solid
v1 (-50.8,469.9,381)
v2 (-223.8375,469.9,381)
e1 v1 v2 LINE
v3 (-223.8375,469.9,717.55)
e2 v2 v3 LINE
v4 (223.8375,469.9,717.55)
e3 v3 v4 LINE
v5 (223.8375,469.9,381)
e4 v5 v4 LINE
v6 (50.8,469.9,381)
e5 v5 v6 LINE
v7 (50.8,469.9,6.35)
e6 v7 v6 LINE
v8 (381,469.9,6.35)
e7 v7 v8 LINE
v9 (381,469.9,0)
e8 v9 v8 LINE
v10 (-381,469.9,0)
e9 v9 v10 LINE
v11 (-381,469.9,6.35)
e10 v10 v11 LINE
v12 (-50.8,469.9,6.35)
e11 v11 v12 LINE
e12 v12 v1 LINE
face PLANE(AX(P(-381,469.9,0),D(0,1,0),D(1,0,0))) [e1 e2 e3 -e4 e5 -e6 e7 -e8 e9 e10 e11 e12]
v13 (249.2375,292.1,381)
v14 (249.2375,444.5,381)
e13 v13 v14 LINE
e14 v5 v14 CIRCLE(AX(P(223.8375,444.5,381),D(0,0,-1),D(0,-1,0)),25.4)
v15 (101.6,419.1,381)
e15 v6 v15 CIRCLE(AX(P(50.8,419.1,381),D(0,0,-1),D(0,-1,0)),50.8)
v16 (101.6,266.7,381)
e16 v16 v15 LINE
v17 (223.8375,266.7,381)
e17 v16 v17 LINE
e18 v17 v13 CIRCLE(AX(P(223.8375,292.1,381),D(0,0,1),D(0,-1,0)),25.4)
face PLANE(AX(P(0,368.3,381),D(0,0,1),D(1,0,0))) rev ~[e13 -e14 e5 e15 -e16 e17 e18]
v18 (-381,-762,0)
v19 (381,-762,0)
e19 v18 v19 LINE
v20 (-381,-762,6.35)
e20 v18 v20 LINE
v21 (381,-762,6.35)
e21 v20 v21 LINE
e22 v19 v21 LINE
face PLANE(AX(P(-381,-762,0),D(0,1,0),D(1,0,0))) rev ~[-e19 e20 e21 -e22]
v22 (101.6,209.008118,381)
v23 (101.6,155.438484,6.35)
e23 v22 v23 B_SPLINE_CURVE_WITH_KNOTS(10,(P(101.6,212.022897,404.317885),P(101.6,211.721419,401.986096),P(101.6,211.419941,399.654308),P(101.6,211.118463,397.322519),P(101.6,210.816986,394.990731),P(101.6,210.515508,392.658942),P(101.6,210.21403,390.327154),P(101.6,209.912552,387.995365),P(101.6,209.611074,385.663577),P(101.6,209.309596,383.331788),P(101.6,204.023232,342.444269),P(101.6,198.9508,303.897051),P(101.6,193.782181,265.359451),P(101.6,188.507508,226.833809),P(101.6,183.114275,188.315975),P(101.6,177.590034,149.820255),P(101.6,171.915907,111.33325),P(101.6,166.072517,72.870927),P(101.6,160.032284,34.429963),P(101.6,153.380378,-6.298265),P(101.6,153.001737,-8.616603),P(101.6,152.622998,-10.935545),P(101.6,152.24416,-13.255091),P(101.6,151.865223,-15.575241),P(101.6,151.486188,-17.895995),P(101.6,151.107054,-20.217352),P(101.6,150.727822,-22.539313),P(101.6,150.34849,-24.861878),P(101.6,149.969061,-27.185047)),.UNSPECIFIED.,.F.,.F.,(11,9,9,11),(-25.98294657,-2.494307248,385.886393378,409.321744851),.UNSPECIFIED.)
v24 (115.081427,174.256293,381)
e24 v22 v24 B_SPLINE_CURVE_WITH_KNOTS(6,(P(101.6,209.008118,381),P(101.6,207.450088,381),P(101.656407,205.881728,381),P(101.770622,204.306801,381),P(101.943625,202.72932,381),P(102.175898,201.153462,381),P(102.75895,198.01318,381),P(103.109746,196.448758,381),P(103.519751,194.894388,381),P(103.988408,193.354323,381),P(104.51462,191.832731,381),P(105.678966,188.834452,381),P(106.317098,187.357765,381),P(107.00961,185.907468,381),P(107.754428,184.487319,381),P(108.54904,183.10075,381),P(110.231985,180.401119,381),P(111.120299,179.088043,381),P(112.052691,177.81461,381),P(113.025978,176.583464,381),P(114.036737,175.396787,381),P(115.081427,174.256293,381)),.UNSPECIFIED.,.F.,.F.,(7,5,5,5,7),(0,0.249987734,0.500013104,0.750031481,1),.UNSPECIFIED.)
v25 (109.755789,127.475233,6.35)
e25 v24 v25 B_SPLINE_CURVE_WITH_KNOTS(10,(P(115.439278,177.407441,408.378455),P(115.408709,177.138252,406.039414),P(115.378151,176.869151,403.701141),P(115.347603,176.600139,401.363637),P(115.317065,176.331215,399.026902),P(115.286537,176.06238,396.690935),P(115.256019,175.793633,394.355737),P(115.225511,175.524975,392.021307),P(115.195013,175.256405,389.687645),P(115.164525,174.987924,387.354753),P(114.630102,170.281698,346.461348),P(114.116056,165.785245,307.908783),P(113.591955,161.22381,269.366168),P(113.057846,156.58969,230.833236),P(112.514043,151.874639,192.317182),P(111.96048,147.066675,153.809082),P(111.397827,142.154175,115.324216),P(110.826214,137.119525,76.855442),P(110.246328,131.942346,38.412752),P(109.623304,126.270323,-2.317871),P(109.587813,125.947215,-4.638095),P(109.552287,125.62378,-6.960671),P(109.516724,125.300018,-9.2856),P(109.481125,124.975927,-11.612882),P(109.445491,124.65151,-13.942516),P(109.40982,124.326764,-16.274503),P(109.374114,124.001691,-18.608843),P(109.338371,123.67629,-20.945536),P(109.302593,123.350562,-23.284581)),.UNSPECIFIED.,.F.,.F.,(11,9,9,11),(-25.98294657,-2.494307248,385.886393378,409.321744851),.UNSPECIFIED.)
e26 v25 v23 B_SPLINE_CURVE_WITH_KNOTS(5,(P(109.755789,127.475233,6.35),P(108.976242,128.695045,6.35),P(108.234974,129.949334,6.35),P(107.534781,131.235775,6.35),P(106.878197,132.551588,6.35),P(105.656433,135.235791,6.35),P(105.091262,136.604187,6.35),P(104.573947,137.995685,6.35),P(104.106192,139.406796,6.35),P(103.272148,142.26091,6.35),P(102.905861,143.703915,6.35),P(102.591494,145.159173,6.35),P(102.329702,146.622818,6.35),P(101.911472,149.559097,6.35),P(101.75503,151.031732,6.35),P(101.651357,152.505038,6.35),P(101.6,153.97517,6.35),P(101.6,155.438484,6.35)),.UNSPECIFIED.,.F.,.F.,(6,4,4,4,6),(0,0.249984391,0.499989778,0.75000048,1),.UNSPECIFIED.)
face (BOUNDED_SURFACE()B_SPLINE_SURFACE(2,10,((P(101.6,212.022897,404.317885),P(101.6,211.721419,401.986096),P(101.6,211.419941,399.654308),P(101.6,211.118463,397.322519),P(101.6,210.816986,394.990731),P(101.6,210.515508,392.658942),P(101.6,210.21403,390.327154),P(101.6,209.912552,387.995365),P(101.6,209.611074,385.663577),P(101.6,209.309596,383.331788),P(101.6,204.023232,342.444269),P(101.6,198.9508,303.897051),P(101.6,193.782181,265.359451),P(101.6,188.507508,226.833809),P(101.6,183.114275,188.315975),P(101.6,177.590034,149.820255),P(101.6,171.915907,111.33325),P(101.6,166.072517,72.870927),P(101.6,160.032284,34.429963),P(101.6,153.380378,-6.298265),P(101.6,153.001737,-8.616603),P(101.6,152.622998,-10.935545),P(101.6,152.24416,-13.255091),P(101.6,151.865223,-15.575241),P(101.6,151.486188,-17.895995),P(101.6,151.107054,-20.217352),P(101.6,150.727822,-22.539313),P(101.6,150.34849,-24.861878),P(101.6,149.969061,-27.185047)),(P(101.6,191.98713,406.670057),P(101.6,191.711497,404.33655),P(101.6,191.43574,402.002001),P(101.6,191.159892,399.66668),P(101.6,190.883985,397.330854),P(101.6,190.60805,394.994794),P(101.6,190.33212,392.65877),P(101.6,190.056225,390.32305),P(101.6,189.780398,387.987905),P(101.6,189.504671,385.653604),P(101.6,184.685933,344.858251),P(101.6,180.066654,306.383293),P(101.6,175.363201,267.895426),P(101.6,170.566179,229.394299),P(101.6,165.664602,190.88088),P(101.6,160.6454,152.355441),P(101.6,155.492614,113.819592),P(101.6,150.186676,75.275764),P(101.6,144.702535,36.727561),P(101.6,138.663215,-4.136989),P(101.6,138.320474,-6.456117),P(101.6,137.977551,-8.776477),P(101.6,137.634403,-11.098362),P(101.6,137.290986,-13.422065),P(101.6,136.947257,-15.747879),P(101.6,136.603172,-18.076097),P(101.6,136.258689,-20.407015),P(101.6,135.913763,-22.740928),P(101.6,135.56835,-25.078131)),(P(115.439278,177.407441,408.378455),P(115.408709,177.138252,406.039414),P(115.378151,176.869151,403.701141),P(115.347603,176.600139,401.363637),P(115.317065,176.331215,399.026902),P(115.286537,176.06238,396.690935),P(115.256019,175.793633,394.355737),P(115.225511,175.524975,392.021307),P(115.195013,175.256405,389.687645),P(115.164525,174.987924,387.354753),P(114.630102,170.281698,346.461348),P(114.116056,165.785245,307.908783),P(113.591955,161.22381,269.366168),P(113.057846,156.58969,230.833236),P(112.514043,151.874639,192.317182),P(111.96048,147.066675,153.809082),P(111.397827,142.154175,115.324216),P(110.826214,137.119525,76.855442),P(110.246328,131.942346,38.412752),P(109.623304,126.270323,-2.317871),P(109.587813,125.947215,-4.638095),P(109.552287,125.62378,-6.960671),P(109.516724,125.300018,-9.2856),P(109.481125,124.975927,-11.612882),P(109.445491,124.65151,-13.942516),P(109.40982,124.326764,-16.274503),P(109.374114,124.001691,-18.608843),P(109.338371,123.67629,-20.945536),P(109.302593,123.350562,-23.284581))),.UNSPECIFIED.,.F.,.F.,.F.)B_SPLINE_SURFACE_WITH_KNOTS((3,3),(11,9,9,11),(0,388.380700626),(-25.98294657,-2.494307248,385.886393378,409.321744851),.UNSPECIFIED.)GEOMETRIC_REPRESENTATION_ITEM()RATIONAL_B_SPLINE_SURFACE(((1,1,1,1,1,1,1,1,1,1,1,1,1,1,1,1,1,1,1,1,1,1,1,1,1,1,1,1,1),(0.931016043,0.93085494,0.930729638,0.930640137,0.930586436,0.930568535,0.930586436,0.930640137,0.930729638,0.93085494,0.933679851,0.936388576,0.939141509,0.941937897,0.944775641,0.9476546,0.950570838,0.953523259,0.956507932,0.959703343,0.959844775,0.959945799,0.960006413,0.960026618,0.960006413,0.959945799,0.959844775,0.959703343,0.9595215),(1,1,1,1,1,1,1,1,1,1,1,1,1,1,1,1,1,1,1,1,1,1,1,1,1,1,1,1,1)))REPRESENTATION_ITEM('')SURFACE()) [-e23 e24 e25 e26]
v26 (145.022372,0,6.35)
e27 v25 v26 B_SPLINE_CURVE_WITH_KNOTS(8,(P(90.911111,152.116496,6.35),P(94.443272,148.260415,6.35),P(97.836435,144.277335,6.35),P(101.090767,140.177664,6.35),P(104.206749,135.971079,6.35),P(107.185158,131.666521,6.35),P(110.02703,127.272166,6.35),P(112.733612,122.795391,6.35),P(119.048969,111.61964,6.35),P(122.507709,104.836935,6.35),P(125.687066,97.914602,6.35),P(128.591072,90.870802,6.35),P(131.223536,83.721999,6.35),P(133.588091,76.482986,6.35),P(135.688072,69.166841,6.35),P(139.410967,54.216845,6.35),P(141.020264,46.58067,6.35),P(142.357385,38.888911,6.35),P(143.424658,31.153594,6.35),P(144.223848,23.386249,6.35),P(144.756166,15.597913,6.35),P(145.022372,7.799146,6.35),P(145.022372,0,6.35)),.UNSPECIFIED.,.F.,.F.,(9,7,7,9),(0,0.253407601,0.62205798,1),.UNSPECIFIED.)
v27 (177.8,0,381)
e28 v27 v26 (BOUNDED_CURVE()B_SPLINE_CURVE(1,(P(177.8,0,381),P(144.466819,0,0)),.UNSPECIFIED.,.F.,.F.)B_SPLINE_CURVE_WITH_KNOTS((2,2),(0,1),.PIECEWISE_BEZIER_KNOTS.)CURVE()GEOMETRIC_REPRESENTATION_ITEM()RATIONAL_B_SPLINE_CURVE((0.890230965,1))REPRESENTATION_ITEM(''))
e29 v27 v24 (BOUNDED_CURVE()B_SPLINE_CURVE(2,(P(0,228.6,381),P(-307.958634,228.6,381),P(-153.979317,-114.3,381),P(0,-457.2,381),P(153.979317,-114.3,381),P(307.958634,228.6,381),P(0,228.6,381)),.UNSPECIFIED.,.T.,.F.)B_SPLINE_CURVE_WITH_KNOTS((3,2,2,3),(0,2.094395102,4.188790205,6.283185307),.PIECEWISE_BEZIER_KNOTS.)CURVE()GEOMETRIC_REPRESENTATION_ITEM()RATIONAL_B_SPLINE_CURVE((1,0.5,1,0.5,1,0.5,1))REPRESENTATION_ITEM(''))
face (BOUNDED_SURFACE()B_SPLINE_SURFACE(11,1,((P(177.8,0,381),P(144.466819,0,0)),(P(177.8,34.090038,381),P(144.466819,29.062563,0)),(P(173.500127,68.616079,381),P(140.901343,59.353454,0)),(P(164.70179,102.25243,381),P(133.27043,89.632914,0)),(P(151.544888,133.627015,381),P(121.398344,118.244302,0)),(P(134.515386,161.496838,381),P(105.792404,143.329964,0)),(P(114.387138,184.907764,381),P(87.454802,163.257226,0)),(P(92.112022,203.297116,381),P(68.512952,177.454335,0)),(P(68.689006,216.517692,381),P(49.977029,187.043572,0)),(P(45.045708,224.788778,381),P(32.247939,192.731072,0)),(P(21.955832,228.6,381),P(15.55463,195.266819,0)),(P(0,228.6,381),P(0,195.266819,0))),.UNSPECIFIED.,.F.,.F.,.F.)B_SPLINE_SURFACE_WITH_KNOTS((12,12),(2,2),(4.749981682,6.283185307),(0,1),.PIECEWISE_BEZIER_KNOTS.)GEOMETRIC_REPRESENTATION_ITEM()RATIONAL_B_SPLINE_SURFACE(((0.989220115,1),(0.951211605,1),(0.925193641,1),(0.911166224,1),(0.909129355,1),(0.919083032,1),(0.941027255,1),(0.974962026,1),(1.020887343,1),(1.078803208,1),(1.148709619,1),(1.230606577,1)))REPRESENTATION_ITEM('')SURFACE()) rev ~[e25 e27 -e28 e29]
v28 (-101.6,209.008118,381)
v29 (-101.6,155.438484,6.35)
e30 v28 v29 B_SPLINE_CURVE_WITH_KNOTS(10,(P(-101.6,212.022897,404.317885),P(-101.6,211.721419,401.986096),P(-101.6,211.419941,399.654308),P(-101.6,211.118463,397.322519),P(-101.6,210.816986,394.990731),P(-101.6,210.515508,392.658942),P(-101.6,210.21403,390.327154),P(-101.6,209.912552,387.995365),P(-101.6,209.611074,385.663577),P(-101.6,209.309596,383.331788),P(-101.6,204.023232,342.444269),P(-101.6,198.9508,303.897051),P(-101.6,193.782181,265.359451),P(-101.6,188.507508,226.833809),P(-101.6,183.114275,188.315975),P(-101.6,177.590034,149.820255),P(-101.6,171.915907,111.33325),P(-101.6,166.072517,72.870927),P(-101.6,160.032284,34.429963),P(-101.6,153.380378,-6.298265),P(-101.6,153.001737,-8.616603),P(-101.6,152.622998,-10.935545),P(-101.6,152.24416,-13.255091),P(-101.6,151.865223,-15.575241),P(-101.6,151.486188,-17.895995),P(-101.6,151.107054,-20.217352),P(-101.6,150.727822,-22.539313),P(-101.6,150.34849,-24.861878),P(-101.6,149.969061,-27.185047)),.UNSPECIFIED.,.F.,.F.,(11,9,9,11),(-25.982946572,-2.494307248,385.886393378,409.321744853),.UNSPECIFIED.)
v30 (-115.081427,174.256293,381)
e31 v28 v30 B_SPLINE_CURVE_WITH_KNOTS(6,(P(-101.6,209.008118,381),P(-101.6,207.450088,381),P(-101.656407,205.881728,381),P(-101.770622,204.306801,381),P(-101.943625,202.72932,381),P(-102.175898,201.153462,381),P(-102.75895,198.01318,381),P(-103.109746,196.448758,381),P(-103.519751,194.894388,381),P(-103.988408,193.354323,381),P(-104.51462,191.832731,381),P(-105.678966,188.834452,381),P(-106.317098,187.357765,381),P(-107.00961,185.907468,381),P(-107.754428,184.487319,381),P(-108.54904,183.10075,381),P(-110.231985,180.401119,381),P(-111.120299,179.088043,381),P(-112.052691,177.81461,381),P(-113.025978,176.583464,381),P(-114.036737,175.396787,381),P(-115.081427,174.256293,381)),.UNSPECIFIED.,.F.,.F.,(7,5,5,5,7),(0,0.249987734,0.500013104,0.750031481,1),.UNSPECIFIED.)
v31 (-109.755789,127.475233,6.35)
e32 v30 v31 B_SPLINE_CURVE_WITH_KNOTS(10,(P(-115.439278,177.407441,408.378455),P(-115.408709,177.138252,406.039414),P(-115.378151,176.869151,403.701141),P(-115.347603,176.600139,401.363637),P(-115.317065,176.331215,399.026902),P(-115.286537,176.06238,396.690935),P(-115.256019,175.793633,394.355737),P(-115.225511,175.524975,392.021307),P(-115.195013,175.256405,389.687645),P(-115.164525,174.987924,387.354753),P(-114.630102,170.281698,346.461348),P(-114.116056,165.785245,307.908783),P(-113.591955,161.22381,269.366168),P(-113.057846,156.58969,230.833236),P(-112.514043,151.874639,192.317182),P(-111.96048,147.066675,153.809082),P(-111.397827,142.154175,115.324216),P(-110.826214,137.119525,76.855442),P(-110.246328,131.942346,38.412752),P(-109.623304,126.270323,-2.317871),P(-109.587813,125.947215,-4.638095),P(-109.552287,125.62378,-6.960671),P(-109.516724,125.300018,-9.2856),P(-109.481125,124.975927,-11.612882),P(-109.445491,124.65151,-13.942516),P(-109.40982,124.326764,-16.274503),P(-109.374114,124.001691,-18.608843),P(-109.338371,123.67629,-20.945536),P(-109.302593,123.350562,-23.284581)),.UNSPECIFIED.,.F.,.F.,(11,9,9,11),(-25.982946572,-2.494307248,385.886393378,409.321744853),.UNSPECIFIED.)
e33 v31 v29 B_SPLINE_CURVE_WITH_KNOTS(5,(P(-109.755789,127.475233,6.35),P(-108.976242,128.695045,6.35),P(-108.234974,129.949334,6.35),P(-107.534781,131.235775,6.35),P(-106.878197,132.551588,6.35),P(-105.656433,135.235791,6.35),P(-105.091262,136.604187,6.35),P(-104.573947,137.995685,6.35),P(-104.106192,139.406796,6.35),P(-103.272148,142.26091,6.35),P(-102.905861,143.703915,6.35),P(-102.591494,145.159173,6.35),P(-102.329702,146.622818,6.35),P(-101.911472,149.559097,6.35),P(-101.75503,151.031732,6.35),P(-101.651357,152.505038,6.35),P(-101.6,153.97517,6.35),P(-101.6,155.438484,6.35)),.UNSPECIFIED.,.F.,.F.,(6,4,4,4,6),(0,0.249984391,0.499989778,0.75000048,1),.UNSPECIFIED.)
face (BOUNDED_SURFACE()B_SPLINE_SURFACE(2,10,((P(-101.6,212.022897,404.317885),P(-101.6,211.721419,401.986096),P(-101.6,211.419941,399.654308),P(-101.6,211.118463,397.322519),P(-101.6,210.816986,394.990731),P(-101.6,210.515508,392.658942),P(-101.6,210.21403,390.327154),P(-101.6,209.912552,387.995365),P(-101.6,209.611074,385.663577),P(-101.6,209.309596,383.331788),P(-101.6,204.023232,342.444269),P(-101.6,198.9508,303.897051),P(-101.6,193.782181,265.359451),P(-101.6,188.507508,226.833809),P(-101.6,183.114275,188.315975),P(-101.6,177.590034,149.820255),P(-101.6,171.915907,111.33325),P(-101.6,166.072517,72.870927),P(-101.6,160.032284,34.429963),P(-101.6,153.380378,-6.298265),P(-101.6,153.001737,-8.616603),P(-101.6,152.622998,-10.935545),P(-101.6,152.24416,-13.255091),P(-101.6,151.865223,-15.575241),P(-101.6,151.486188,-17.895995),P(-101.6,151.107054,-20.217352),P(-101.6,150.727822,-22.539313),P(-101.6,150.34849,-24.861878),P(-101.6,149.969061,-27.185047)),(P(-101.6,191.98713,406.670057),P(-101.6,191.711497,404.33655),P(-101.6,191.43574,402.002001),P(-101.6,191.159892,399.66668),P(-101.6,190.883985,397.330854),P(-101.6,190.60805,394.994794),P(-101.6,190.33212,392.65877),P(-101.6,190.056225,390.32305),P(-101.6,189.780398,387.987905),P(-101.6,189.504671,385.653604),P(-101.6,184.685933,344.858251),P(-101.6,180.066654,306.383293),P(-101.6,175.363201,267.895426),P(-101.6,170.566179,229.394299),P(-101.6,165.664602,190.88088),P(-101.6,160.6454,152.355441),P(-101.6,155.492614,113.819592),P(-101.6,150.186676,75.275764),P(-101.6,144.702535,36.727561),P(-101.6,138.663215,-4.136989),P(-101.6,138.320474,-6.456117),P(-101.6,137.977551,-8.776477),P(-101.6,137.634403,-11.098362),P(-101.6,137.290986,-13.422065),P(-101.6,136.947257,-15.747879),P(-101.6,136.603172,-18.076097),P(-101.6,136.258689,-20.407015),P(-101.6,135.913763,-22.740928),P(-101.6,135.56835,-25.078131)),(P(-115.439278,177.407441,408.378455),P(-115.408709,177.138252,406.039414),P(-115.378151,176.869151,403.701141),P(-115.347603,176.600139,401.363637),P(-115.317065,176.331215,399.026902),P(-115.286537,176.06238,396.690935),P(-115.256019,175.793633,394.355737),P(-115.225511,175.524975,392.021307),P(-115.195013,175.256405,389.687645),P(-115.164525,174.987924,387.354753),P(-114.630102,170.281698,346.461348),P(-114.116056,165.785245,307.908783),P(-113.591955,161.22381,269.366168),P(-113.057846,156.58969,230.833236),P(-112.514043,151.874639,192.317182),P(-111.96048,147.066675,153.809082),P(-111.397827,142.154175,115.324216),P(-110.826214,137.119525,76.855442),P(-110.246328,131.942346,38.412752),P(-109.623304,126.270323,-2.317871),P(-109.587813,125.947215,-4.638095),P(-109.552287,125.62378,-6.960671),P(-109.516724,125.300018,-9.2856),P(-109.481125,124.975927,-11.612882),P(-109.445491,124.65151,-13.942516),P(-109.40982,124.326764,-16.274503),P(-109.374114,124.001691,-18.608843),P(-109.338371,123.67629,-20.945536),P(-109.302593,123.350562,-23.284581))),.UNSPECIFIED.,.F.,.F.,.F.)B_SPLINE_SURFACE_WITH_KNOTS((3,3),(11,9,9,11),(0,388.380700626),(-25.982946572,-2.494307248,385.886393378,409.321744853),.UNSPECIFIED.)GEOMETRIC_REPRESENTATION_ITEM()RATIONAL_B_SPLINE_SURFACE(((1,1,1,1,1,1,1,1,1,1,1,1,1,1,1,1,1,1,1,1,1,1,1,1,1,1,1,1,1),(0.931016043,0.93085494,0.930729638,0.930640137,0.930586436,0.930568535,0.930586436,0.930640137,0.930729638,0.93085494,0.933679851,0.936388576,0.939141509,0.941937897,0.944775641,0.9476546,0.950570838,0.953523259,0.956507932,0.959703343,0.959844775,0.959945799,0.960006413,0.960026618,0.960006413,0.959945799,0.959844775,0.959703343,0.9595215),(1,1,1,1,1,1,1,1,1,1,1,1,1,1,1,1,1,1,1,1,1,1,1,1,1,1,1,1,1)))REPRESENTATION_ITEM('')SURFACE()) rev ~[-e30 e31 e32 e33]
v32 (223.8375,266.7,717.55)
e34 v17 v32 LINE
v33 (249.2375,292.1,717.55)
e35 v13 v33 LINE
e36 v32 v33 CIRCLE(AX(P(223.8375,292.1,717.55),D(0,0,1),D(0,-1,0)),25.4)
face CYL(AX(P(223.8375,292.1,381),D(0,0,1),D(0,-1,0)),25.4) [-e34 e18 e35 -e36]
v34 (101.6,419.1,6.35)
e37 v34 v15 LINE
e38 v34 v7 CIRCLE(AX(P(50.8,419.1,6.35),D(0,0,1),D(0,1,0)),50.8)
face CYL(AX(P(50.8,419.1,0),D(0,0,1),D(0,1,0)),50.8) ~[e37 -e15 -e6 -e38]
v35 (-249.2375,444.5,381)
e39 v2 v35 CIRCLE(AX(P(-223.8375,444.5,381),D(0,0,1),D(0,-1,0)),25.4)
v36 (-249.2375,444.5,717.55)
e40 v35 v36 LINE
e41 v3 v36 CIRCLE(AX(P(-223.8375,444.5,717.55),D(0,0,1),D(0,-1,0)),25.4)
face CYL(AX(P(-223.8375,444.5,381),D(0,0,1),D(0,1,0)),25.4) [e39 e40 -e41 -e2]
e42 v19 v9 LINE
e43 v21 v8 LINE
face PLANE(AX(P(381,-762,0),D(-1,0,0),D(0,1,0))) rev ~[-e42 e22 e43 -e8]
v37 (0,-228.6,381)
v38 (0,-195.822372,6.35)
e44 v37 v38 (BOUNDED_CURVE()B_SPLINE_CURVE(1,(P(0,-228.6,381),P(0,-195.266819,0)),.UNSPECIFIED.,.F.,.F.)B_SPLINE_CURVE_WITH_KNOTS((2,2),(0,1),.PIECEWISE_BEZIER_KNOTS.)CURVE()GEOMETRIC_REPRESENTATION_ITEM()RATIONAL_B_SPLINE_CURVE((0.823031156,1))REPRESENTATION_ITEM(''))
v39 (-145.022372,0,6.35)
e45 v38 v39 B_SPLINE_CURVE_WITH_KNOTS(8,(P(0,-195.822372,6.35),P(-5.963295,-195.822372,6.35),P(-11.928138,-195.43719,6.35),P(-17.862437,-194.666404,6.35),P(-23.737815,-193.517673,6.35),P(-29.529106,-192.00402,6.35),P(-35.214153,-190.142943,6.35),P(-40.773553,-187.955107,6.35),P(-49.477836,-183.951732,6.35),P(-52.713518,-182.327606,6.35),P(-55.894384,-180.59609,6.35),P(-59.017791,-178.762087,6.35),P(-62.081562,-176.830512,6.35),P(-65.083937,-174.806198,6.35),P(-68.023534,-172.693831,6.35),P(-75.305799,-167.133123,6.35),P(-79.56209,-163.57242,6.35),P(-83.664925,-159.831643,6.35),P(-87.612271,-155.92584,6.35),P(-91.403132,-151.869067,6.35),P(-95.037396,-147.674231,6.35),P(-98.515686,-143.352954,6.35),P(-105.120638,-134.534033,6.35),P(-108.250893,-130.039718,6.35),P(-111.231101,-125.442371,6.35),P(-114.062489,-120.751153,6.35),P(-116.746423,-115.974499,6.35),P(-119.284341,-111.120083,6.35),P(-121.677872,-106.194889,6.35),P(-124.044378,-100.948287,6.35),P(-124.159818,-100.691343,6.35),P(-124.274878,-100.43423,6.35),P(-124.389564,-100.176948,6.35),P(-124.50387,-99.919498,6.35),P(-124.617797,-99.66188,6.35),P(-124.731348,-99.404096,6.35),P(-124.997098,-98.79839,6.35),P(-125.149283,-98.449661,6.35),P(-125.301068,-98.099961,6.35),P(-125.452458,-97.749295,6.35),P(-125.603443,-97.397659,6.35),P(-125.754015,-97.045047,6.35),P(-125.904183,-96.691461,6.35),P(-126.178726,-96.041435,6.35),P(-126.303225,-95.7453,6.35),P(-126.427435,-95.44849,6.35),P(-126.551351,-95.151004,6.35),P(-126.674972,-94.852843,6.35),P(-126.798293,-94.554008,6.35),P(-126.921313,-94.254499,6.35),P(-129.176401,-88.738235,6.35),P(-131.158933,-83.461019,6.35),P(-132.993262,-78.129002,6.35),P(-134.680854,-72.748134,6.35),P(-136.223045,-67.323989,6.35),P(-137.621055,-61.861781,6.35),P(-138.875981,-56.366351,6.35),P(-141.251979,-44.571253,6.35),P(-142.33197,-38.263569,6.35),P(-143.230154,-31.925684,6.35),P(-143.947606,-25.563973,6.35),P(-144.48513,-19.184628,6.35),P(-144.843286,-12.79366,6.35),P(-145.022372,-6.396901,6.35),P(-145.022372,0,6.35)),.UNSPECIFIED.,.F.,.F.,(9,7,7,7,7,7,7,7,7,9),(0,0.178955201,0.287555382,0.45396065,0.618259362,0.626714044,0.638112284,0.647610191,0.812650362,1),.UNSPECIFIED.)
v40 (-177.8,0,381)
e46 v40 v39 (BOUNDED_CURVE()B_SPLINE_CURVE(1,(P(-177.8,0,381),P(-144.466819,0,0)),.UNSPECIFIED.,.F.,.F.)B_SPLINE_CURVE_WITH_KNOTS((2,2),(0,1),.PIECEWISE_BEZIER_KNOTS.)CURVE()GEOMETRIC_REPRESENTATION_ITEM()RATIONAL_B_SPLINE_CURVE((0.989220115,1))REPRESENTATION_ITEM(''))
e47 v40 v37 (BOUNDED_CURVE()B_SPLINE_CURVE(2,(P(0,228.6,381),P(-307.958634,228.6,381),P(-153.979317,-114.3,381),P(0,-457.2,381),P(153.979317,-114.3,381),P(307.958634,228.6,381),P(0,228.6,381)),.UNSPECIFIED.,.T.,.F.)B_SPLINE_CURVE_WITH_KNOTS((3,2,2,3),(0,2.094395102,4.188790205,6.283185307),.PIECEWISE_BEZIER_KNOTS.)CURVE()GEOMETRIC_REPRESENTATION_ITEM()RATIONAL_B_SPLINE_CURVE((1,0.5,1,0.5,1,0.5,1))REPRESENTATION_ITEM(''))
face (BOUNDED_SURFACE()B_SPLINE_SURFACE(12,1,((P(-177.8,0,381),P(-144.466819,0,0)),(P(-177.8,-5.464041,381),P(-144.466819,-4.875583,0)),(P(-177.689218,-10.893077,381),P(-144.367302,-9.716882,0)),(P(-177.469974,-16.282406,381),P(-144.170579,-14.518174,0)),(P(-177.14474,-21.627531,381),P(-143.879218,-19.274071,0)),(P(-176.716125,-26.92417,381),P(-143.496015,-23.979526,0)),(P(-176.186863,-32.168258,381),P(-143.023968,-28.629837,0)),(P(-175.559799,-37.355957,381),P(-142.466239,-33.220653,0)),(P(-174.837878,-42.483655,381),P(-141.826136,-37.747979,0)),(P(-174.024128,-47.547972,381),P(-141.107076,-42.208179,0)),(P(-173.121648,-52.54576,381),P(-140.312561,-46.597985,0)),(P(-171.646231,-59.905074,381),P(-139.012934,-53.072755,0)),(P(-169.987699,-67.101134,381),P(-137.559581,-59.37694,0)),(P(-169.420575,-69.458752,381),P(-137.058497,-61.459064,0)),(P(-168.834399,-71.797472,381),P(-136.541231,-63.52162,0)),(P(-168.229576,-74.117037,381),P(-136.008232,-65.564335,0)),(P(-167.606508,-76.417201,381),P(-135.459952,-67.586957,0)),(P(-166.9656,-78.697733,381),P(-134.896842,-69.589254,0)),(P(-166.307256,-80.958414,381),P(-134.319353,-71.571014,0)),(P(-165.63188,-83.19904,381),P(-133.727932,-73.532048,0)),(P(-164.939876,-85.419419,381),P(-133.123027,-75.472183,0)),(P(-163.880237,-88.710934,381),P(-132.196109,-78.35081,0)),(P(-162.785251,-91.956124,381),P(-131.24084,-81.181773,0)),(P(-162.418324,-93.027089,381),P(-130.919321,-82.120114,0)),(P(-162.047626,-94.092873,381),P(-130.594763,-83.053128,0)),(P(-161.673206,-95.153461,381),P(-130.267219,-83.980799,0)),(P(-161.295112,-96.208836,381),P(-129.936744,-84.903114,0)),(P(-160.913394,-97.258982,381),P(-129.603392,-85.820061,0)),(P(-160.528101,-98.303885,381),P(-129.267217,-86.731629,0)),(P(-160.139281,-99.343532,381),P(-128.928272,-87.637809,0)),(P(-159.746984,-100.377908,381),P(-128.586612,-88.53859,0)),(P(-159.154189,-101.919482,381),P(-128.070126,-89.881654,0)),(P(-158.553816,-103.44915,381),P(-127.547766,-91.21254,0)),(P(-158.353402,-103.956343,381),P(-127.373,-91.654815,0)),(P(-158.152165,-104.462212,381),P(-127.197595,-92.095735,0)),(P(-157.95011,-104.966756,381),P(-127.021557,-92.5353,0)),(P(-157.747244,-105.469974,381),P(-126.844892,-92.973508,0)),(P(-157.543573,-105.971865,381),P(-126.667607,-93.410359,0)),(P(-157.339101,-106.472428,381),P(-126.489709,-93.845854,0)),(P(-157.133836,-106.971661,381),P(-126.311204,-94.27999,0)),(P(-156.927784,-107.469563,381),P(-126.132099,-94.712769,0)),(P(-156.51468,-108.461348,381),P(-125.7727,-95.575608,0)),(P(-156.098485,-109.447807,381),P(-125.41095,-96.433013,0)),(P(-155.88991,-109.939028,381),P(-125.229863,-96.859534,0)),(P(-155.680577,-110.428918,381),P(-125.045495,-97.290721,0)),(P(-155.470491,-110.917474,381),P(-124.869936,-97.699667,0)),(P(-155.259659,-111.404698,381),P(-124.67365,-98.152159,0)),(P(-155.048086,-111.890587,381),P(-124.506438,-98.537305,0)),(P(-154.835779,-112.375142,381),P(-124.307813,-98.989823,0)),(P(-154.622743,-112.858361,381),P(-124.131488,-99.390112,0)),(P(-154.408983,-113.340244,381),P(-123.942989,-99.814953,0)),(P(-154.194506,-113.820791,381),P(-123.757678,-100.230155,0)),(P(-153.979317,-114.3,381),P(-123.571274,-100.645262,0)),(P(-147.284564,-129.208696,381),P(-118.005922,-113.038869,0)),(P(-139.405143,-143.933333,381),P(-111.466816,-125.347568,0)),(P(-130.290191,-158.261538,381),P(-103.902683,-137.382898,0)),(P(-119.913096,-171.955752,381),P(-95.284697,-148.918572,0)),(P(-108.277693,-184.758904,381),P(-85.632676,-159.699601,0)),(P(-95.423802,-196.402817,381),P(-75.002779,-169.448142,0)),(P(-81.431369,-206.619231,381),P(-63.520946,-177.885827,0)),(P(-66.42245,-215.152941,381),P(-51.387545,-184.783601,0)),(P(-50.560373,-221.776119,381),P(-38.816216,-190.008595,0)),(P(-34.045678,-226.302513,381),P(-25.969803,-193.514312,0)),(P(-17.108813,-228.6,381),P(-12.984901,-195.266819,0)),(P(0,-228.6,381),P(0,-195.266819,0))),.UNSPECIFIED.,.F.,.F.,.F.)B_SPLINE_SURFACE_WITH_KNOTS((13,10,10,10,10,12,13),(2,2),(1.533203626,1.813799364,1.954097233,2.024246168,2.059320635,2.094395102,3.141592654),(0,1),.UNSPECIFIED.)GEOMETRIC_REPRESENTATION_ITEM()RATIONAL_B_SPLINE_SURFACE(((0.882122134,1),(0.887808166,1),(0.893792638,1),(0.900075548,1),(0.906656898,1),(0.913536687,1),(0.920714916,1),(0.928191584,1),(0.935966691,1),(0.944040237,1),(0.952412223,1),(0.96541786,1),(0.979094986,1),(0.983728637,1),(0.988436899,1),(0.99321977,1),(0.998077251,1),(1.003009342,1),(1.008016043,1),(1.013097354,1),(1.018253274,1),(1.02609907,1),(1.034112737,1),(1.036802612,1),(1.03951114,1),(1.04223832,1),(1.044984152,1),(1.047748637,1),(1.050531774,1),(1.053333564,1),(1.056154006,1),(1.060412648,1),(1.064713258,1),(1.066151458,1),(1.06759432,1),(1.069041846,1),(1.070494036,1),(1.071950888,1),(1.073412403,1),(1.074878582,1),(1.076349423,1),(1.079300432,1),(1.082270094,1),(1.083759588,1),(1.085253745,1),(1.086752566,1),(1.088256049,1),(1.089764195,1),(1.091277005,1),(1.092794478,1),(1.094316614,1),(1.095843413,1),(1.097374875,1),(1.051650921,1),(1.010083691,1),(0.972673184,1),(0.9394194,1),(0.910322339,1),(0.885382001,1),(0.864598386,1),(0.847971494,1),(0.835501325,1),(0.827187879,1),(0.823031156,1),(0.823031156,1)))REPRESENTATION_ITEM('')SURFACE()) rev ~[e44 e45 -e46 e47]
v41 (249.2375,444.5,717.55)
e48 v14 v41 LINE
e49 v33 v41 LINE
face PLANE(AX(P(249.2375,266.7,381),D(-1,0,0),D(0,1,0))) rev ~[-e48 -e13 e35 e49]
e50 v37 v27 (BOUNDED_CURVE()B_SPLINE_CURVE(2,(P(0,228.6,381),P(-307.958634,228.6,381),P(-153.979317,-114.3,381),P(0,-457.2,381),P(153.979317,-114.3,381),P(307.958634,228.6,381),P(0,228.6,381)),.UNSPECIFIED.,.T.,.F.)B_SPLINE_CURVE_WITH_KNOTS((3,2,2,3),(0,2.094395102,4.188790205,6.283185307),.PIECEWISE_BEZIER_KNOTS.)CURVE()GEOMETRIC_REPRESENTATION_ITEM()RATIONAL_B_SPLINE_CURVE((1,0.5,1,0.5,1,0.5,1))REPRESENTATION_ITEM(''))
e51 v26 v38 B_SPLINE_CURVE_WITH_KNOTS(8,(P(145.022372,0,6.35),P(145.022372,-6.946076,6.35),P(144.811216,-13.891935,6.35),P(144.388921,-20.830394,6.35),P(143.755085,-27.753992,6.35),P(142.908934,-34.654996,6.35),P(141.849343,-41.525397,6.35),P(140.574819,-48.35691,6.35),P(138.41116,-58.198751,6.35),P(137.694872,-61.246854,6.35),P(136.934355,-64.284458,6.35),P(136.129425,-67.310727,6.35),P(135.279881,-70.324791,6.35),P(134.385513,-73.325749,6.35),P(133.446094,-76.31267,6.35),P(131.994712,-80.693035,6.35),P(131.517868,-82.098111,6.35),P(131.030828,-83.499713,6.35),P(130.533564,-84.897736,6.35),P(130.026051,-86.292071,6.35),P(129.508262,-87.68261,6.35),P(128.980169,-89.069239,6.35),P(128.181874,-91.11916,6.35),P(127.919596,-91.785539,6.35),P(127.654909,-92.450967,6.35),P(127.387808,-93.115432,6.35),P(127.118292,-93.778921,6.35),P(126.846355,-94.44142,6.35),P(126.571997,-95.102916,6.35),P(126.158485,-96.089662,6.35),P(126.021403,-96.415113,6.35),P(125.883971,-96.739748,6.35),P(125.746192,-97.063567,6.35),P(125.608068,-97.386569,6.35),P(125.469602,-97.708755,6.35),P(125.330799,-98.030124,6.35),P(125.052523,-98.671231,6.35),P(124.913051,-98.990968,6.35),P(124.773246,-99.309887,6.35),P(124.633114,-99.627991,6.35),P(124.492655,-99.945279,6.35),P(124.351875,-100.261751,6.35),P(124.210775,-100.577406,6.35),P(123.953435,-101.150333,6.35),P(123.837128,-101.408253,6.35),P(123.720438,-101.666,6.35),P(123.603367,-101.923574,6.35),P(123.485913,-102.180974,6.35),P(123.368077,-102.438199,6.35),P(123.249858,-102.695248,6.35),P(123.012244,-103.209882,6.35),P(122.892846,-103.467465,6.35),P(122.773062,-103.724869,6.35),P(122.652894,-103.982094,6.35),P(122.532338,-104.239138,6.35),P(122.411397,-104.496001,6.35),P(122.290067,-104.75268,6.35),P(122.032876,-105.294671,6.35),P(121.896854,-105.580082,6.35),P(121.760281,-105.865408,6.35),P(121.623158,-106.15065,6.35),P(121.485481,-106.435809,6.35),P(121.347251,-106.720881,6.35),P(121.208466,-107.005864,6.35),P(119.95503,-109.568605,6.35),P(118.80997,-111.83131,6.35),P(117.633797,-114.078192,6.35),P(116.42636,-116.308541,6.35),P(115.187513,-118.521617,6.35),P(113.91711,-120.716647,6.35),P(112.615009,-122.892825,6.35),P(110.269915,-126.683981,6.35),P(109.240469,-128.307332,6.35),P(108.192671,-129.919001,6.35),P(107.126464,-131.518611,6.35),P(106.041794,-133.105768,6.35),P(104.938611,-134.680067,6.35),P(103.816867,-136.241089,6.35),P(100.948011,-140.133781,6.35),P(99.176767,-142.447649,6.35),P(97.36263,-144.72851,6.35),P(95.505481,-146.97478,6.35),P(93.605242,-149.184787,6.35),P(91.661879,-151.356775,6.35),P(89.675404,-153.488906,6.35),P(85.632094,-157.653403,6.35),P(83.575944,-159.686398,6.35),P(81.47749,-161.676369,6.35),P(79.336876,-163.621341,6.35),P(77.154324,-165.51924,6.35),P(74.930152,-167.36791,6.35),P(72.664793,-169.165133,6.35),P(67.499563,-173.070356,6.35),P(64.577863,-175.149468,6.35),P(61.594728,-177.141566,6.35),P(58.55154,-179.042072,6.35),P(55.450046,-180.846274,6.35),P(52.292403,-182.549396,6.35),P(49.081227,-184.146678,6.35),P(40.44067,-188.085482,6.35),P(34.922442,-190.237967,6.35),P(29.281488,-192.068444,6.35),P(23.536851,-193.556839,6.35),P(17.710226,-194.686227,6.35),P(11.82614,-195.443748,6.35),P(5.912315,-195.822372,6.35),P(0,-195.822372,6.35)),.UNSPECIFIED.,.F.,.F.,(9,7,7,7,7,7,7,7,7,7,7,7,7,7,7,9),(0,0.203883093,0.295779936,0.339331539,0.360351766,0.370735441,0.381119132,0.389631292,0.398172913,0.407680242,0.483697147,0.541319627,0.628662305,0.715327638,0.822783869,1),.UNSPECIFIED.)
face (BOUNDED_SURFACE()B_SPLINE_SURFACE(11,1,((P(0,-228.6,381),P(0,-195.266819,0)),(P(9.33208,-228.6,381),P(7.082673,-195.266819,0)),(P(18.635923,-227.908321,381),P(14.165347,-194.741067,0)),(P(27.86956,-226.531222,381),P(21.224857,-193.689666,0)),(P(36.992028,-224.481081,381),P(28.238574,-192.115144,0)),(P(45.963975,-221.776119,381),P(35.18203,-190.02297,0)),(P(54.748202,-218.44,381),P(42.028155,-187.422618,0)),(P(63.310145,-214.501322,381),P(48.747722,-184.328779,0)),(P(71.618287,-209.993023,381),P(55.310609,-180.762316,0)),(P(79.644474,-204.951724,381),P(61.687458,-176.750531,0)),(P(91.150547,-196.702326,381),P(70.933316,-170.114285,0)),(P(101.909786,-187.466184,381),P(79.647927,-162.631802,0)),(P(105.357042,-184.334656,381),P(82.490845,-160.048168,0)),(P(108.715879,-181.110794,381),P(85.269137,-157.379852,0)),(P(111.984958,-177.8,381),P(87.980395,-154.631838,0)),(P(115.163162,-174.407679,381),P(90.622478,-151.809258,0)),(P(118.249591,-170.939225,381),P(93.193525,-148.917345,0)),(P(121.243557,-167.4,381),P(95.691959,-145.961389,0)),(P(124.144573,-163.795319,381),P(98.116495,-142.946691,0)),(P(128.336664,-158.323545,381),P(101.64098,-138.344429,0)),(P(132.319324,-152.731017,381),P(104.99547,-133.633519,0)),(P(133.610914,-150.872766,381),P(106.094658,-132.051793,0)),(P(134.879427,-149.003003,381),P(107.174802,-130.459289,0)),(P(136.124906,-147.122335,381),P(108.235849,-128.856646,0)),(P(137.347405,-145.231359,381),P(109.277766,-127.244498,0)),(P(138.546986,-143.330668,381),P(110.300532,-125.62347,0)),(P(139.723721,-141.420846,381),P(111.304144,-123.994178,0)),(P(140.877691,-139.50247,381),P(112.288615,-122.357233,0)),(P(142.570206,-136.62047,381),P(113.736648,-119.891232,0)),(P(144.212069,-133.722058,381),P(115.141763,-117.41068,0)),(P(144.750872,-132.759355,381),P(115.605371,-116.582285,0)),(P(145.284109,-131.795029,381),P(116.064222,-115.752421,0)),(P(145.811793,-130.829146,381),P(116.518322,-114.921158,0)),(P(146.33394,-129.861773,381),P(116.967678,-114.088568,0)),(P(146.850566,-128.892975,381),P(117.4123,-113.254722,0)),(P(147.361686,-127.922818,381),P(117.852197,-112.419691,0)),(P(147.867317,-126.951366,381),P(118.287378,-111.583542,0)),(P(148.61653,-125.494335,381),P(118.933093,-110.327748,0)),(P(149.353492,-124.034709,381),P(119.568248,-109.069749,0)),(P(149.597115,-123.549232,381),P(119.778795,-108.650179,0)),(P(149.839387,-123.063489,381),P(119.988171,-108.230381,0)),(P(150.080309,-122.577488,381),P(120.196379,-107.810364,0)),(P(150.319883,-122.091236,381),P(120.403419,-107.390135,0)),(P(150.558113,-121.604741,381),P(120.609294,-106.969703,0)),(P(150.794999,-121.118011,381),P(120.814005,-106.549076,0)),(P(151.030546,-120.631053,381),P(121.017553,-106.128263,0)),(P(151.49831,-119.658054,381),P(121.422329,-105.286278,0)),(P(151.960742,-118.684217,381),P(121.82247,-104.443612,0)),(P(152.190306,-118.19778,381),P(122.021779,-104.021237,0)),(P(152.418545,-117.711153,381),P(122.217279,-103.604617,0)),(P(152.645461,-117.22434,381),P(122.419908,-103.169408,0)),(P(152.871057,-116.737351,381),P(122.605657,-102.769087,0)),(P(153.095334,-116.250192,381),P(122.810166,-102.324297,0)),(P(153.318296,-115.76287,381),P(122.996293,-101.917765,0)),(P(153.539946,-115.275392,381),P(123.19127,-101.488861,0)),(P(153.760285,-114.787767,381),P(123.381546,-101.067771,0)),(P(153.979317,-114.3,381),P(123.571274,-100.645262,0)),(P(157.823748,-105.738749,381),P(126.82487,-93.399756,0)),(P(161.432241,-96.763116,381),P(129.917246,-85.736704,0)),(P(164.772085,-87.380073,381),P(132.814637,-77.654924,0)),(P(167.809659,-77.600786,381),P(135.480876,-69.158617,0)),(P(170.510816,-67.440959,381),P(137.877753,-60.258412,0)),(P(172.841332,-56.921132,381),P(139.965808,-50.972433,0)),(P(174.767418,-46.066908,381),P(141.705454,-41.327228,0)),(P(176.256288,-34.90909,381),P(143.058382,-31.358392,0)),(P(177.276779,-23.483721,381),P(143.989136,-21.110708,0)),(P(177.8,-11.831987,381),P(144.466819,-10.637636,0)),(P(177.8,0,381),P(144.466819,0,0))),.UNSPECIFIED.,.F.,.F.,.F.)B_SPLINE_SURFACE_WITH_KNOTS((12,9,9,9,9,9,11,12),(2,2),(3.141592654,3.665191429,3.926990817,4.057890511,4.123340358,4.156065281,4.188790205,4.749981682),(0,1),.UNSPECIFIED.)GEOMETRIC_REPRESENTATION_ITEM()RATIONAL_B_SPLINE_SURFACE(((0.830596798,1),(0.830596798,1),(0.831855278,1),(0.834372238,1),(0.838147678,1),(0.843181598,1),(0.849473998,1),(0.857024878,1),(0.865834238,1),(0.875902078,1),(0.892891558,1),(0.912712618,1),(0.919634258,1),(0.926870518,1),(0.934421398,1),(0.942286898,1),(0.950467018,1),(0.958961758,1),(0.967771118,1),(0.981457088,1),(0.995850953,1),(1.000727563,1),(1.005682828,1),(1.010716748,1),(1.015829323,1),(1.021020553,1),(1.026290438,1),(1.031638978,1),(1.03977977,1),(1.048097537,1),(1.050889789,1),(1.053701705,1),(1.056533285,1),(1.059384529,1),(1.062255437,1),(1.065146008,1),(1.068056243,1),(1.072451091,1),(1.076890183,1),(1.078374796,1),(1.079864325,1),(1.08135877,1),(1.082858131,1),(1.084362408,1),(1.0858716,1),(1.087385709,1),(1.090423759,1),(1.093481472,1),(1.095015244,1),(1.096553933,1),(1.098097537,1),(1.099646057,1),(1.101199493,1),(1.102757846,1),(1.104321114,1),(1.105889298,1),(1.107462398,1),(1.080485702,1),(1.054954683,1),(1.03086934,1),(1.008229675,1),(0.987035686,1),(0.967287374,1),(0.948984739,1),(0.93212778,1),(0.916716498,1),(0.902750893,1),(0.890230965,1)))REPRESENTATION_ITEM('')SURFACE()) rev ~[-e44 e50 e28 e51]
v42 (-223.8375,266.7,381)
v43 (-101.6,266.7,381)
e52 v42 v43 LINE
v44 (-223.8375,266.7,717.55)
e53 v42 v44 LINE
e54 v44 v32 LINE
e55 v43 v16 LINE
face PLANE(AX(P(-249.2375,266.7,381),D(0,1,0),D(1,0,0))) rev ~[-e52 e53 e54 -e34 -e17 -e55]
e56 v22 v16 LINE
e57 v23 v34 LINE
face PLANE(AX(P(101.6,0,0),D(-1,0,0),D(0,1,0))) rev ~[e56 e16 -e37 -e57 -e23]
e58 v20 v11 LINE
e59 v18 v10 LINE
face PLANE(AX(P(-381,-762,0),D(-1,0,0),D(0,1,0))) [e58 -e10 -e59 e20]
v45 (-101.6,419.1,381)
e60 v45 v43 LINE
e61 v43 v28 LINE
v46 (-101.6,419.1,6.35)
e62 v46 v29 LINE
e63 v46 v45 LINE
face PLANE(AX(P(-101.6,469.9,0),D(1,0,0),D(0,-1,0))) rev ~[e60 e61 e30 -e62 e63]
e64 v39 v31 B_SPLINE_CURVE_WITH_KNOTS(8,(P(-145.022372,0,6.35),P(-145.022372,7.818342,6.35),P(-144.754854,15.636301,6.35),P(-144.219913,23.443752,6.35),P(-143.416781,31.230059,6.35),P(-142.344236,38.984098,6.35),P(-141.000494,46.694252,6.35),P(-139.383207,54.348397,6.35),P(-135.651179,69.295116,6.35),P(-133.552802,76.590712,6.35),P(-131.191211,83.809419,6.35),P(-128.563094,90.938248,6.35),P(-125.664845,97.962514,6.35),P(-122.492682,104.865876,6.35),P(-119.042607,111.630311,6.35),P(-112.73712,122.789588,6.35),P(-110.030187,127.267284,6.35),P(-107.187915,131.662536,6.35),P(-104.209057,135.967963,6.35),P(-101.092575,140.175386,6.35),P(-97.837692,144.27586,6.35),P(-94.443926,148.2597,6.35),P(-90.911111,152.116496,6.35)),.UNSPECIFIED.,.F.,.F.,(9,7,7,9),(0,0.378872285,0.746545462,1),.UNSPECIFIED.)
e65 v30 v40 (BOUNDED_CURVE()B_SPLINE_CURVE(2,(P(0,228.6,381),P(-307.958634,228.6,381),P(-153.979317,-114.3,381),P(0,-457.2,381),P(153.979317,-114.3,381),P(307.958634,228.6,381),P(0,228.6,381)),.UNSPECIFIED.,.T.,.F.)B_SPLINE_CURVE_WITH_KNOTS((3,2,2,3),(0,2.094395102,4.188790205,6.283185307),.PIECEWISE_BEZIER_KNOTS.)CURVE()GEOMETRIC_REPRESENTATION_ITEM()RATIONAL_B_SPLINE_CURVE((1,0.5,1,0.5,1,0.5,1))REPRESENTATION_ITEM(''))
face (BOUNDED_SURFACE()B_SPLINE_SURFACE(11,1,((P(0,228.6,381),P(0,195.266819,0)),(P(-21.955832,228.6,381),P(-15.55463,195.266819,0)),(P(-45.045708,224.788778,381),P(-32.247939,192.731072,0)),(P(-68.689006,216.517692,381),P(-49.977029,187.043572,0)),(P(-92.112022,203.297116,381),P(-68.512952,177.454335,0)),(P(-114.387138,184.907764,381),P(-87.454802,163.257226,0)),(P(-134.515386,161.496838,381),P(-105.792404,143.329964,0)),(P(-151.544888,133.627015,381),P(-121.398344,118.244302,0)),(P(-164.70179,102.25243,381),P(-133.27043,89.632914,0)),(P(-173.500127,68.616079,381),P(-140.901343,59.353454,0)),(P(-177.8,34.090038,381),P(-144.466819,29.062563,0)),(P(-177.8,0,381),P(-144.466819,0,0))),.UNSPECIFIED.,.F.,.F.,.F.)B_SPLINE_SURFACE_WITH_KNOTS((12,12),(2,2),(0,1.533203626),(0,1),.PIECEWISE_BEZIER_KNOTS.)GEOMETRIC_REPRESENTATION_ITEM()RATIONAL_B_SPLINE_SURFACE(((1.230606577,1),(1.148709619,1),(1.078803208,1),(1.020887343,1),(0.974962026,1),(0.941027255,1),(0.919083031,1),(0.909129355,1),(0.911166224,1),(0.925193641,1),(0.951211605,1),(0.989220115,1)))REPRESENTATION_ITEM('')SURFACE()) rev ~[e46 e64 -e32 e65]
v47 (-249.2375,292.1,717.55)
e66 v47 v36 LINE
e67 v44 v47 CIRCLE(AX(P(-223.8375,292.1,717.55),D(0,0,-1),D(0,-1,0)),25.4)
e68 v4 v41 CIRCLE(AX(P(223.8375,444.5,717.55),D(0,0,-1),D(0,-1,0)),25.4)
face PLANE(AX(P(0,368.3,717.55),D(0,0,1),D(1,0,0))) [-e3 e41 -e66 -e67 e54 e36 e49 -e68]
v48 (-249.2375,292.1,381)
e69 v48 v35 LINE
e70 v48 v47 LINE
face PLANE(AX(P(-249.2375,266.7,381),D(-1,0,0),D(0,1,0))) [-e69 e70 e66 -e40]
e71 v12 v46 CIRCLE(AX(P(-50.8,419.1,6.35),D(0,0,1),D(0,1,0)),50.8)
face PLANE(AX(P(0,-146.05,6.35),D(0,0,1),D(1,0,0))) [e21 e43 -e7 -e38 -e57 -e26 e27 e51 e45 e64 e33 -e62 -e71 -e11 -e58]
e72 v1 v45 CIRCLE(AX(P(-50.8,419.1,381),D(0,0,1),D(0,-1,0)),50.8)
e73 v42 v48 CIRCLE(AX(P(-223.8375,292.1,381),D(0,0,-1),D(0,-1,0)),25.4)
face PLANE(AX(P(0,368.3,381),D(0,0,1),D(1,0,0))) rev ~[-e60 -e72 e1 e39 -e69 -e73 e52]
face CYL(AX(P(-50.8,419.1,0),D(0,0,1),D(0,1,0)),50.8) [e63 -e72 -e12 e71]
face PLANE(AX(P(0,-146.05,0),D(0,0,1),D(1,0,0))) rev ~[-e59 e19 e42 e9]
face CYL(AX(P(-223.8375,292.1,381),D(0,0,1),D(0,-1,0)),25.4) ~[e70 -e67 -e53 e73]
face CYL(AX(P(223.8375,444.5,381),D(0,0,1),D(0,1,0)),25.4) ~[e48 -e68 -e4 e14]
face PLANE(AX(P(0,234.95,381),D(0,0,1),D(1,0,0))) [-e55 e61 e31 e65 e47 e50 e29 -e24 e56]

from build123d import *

# Parameters (mm, degrees)
F6_DEPTH  = 381
F6_TAPER  = 5
F7_DEPTH  = 381
F4_W      = 498.475
F4_H      = 203.2
F8_DEPTH  = 336.55
F9_R      = 50.8
F10_R     = 50.8
F11_R     = 25.4
F5_W      = 762
F5_H      = 1231.9
F12_DEPTH = 6.35


with BuildPart() as f6:
    # F2 (on offset) → F6 (new body, through all)
    with BuildSketch(Plane.XY.offset(381)):
        with BuildLine():
            add(Edge.make_bspline(
                [(0, 228.6), (-307.9586335857, 228.6), (-153.9793167929, -114.3), (0, -457.2), (153.9793167929, -114.3), (307.9586335857, 228.6), (0, 228.6)],
                knots=[0, 0, 0, 2.0943951024, 2.0943951024, 4.1887902048, 4.1887902048, 6.2831853072, 6.2831853072, 6.2831853072], degree=2, weights=[1, 0.5, 1, 0.5, 1, 0.5, 1]))
        make_face()
    extrude(amount=-F6_DEPTH, taper=F6_TAPER)

    # F3 (on Top) → F7 (join, through all)
    with BuildSketch(Plane.XY):
        Polygon((-101.6, 469.9), (-101.6, 0), (0, 0), (101.6, 0), (101.6, 469.9), align=None)
    extrude(amount=F7_DEPTH)

    # F4 (on offset) → F8 (join, through all)
    with BuildSketch(Plane.XY.offset(381)):
        with Locations((0, 368.3)):
            Rectangle(F4_W, F4_H)
    extrude(amount=F8_DEPTH)

    # F9
    f9_edges = [f6.edges().sort_by_distance(p)[0] for p in [
        (-101.6, 469.9, 190.5),
        (101.6, 469.9, 190.5),
    ]]
    fillet(f9_edges, radius=F9_R)

    # F10
    f10_edges = [f6.edges().sort_by_distance(p)[0] for p in [
        (101.6, 164.265069, 190.329553),
        (-101.6, 164.265069, 190.329553),
    ]]
    fillet(f10_edges, radius=F10_R)

    # F11
    f11_edges = [f6.edges().sort_by_distance(p)[0] for p in [
        (249.2375, 266.7, 549.275),
        (249.2375, 469.9, 549.275),
        (-249.2375, 266.7, 549.275),
        (-249.2375, 469.9, 549.275),
    ]]
    fillet(f11_edges, radius=F11_R)

    # F5 (on Top) → F12 (join)
    with BuildSketch(Plane.XY):
        with Locations((0, -146.05)):
            Rectangle(F5_W, F5_H)
    extrude(amount=F12_DEPTH)


solid = f6.part
